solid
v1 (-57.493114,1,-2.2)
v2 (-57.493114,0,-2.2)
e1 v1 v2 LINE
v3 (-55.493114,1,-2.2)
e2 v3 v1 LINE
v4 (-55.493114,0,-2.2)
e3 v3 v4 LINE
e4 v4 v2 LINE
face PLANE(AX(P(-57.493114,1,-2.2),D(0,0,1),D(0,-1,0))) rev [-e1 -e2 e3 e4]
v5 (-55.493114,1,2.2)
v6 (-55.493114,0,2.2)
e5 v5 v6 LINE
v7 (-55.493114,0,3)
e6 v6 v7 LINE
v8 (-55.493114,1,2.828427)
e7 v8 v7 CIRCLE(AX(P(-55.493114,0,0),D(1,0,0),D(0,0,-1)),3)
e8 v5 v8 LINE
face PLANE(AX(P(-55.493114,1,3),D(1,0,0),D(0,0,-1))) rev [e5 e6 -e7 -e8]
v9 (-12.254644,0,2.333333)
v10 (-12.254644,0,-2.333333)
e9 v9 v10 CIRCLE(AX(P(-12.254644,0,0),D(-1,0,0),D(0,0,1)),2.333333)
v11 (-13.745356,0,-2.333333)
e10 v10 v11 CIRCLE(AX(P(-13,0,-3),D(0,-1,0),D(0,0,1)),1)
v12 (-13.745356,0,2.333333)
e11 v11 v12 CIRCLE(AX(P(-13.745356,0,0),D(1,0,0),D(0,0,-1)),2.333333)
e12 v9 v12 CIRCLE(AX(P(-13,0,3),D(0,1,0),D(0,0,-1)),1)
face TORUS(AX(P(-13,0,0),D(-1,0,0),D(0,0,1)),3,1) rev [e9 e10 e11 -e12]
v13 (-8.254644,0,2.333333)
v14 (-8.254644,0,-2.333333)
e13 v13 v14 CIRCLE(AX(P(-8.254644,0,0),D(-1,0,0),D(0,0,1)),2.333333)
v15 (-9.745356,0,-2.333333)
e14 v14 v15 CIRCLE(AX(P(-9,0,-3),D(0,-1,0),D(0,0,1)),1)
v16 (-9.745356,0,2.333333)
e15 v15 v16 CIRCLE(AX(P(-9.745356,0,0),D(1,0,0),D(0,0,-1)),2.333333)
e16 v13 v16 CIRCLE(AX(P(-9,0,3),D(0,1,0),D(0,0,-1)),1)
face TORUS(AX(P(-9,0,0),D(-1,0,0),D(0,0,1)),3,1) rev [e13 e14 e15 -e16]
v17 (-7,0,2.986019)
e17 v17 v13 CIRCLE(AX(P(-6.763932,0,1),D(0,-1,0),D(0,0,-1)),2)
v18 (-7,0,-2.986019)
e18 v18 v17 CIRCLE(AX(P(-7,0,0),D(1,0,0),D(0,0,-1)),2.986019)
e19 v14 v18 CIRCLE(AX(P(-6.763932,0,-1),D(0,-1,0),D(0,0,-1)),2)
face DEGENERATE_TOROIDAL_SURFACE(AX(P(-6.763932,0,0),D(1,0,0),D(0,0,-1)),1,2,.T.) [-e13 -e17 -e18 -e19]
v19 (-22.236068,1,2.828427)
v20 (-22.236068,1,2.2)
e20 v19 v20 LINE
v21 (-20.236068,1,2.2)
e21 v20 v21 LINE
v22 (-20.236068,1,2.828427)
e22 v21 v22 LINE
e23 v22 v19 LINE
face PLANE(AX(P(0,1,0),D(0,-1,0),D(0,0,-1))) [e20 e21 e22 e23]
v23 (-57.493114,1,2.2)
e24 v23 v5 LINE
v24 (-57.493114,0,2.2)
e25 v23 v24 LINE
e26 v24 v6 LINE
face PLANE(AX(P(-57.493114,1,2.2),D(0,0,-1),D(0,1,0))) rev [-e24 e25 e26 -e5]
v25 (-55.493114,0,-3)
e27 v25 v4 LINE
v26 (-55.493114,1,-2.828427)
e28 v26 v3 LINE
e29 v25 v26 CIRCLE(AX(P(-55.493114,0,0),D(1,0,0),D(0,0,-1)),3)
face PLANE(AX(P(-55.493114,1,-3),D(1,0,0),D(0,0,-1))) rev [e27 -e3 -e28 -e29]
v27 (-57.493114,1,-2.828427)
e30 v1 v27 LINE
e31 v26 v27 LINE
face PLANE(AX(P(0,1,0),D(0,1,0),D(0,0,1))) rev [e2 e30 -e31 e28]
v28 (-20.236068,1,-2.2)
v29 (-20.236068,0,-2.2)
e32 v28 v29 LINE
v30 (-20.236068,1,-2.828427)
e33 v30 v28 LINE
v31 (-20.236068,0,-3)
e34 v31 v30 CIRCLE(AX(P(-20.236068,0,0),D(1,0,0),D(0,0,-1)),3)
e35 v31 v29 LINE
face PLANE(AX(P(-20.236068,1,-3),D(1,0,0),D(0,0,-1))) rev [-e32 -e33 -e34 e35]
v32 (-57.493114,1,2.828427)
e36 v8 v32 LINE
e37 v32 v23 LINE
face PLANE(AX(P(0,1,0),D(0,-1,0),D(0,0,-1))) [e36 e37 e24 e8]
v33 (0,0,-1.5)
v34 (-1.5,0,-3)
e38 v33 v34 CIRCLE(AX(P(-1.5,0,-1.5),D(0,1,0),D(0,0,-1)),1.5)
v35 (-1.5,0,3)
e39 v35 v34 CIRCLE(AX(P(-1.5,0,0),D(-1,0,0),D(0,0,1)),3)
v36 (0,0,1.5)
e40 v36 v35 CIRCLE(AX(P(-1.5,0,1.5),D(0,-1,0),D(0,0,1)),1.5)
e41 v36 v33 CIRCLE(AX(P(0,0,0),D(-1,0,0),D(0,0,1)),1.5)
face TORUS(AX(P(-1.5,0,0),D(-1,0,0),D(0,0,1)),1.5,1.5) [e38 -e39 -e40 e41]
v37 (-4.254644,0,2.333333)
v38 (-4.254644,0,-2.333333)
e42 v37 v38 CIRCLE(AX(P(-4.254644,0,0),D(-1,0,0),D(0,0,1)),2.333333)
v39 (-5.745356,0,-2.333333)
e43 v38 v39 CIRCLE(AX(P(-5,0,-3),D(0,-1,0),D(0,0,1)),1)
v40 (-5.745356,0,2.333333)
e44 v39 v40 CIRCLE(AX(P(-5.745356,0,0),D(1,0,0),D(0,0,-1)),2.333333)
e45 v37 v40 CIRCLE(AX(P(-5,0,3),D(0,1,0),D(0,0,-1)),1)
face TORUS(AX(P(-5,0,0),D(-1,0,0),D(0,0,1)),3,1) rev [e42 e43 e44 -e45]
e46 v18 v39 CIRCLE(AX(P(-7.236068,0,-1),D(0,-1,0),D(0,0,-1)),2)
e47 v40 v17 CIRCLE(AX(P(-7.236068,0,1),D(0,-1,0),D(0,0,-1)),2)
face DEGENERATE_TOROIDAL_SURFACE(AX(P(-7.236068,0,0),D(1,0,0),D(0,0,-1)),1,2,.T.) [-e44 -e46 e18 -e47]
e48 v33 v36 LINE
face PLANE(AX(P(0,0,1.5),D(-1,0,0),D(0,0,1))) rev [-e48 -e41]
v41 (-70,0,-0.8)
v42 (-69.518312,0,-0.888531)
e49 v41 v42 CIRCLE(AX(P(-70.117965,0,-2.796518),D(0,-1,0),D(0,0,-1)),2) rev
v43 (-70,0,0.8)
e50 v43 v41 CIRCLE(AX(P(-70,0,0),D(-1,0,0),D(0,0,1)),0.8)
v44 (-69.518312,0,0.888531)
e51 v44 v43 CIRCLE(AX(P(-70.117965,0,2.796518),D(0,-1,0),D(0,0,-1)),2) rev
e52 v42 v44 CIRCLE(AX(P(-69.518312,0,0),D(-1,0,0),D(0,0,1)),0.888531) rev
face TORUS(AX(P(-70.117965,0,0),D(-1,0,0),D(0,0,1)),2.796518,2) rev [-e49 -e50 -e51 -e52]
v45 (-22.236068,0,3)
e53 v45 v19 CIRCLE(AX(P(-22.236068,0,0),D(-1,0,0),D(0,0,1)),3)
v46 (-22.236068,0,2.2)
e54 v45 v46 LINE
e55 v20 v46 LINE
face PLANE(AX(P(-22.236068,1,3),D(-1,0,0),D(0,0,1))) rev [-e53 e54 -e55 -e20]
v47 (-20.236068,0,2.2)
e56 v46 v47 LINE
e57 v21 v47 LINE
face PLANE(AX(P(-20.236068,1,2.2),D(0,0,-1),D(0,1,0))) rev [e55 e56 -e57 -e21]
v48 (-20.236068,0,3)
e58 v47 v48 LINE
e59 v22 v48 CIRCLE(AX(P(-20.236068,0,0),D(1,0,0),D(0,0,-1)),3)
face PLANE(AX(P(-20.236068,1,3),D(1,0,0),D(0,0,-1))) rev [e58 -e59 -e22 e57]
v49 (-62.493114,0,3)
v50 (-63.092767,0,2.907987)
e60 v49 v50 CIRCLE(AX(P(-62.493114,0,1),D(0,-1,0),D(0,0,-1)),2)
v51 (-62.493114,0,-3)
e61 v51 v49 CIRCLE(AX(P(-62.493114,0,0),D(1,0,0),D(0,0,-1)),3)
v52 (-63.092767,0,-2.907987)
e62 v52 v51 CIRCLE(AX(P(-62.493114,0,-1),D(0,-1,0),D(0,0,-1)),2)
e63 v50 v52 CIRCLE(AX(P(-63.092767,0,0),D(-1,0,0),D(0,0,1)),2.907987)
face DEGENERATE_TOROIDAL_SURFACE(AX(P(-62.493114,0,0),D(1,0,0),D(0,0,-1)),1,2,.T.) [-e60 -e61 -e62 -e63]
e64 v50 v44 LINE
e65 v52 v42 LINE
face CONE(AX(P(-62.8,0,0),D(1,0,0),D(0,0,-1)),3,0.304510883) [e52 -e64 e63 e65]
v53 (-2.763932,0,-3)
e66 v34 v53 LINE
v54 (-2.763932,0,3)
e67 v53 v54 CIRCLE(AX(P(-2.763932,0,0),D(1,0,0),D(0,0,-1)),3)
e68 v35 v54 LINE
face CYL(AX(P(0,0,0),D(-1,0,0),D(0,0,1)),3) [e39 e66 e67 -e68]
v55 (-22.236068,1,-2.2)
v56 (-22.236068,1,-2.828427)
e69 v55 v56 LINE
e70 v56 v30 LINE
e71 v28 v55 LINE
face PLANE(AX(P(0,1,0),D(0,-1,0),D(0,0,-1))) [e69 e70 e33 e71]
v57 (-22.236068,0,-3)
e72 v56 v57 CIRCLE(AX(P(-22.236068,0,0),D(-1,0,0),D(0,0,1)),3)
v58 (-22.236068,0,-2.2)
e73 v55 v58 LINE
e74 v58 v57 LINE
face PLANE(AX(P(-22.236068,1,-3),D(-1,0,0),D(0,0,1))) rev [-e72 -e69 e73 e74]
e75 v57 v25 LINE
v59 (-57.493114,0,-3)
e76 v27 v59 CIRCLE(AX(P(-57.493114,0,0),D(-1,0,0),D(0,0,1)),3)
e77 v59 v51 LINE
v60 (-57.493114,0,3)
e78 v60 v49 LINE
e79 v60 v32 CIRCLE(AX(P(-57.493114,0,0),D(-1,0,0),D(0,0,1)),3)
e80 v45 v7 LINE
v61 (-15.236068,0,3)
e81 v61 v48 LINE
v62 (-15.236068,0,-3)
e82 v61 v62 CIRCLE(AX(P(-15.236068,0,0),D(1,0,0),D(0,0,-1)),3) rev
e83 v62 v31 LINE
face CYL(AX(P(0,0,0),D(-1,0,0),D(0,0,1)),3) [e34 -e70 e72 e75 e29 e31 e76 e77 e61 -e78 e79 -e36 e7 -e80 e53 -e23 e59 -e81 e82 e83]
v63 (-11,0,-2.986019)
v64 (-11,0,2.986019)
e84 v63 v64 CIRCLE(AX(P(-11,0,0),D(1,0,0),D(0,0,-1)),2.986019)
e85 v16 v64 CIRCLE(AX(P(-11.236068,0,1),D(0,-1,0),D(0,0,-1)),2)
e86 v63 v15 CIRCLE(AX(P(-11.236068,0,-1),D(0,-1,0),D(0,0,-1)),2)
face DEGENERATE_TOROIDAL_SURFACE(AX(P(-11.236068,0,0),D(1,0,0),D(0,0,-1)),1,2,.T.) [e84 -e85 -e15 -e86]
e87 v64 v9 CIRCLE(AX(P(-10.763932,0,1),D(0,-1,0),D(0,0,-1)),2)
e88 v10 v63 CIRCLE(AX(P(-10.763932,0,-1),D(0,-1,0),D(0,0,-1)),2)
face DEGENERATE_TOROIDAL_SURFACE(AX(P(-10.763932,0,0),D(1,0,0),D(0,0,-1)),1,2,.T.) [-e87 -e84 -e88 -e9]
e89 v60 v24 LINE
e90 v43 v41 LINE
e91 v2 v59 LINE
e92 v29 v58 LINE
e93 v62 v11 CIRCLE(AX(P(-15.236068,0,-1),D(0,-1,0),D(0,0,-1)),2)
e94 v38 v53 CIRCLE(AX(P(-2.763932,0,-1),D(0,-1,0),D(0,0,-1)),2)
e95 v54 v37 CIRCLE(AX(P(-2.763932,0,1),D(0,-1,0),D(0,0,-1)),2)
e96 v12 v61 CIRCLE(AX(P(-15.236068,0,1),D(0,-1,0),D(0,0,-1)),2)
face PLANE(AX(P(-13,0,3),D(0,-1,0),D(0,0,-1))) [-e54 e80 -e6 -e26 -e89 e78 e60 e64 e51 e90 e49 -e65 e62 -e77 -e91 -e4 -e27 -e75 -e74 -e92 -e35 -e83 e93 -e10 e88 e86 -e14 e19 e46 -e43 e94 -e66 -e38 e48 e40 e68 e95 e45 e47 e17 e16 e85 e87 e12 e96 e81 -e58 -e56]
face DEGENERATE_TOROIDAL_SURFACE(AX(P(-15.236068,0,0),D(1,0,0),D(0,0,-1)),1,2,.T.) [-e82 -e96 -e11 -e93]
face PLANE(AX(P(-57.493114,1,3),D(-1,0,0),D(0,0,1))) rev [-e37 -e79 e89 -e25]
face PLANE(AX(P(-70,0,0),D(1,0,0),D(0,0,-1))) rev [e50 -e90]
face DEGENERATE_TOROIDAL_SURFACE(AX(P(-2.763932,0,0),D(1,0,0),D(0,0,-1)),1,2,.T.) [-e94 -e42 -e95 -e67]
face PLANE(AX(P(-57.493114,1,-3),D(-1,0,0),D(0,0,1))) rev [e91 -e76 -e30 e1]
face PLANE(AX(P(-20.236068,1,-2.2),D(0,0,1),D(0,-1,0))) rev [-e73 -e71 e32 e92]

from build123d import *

# Parameters (mm, degrees)
REVOLVE1_ANGLE     = 180
FILLET1_ANGLE      = 180
FILLET1_2_ANGLE    = 180
SKETCH2_W          = 2
SKETCH2_H          = 0.8
CUT_EXTRUDE1_DEPTH = 1


with BuildPart() as part:
    # Sketch1 → Revolve1 (revolve)
    with BuildSketch(Plane(origin=(0, 0, 0), x_dir=(1, 0, 0), z_dir=(0, 1, 0))):
        with BuildLine():
            Line((0, 0), (-70, 0))
            Line((-70, 0), (-70, 0.8))
            Line((-70, 0.8), (-69.8, 0.8))
            Line((-69.8, 0.8), (-62.8, 3))
            Line((-62.8, 3), (-14, 3))
            ThreePointArc((-14, 3), (-13, 2), (-12, 3))
            Line((-12, 3), (-10, 3))
            ThreePointArc((-10, 3), (-9, 2), (-8, 3))
            Line((-8, 3), (-6, 3))
            ThreePointArc((-6, 3), (-5, 2), (-4, 3))
            Line((-4, 3), (-1.5, 3))
            ThreePointArc((-1.5, 3), (-0.439339828, 2.560660172), (0, 1.5))
            Line((0, 1.5), (0, 0))
        make_face()
    revolve(axis=Axis((0, 0, 0), (1, 0, 0)), revolution_arc=REVOLVE1_ANGLE)

    # Fillet1: read off the stored shape, not the designer's step
    # Fillet1 outline → Fillet1 (revolve)
    with BuildSketch(Plane(origin=(0, 0, 0), x_dir=(0, 0, -1), z_dir=(0, -1, 0))):
        with BuildLine():
            Line((0.8, -69.518311709), (0.8, -70))
            ThreePointArc((0.8, -70), (0.829465257, -69.75643572), (0.888530606, -69.518311709))
            Line((0.888530606, -69.518311709), (0.8, -69.518311709))
        make_face()
    revolve(axis=Axis((0, 0, 0), (1, 0, 0)), revolution_arc=FILLET1_ANGLE)

    # Fillet1 2 outline → Fillet1 2 (revolve, cut)
    with BuildSketch(Plane(origin=(0, 0, 0), x_dir=(0, 0, -1), z_dir=(0, -1, 0))):
        with BuildLine():
            ThreePointArc((3, -62.493114063), (2.976863029, -62.796449795), (2.907987434, -63.092767256))
            Line((2.907987434, -63.092767256), (3, -63.092767256))
            Line((3, -63.092767256), (3, -62.493114063))
        make_face()
        with BuildLine():
            Line((3, -15.236067977), (3, -13.745355992))
            Line((3, -13.745355992), (2.333333333, -13.745355992))
            ThreePointArc((2.333333333, -13.745355992), (2.825741858, -14.419571396), (3, -15.236067977))
        make_face()
        with BuildLine():
            Line((2.333333333, -12.254644008), (3, -12.254644008))
            Line((3, -12.254644008), (3, -9.745355992))
            Line((3, -9.745355992), (2.333333333, -9.745355992))
            ThreePointArc((2.333333333, -9.745355992), (2.774276771, -10.313060967), (2.986019111, -11))
            ThreePointArc((2.986019111, -11), (2.774276771, -11.686939033), (2.333333333, -12.254644008))
        make_face()
        with BuildLine():
            Line((2.333333333, -8.254644008), (3, -8.254644008))
            Line((3, -8.254644008), (3, -5.745355992))
            Line((3, -5.745355992), (2.333333333, -5.745355992))
            ThreePointArc((2.333333333, -5.745355992), (2.774276771, -6.313060967), (2.986019111, -7))
            ThreePointArc((2.986019111, -7), (2.774276771, -7.686939033), (2.333333333, -8.254644008))
        make_face()
        with BuildLine():
            Line((2.333333333, -4.254644008), (3, -4.254644008))
            Line((3, -4.254644008), (3, -2.763932023))
            ThreePointArc((3, -2.763932023), (2.825741858, -3.580428604), (2.333333333, -4.254644008))
        make_face()
    revolve(axis=Axis((0, 0, 0), (1, 0, 0)), revolution_arc=FILLET1_2_ANGLE, mode=Mode.SUBTRACT)

    # Sketch2 → Cut-Extrude1 (cut)
    with BuildSketch(Plane.XZ):
        with Locations((-56.493114063, -2.6)):
            Rectangle(SKETCH2_W, SKETCH2_H)
        with Locations((-21.236067977, -2.6)):
            Rectangle(SKETCH2_W, SKETCH2_H)
        with Locations((-21.236067977, 2.6)):
            Rectangle(SKETCH2_W, SKETCH2_H)
        with Locations((-56.493114063, 2.6)):
            Rectangle(SKETCH2_W, SKETCH2_H)
    extrude(amount=-CUT_EXTRUDE1_DEPTH, mode=Mode.SUBTRACT)


solid = part.part
